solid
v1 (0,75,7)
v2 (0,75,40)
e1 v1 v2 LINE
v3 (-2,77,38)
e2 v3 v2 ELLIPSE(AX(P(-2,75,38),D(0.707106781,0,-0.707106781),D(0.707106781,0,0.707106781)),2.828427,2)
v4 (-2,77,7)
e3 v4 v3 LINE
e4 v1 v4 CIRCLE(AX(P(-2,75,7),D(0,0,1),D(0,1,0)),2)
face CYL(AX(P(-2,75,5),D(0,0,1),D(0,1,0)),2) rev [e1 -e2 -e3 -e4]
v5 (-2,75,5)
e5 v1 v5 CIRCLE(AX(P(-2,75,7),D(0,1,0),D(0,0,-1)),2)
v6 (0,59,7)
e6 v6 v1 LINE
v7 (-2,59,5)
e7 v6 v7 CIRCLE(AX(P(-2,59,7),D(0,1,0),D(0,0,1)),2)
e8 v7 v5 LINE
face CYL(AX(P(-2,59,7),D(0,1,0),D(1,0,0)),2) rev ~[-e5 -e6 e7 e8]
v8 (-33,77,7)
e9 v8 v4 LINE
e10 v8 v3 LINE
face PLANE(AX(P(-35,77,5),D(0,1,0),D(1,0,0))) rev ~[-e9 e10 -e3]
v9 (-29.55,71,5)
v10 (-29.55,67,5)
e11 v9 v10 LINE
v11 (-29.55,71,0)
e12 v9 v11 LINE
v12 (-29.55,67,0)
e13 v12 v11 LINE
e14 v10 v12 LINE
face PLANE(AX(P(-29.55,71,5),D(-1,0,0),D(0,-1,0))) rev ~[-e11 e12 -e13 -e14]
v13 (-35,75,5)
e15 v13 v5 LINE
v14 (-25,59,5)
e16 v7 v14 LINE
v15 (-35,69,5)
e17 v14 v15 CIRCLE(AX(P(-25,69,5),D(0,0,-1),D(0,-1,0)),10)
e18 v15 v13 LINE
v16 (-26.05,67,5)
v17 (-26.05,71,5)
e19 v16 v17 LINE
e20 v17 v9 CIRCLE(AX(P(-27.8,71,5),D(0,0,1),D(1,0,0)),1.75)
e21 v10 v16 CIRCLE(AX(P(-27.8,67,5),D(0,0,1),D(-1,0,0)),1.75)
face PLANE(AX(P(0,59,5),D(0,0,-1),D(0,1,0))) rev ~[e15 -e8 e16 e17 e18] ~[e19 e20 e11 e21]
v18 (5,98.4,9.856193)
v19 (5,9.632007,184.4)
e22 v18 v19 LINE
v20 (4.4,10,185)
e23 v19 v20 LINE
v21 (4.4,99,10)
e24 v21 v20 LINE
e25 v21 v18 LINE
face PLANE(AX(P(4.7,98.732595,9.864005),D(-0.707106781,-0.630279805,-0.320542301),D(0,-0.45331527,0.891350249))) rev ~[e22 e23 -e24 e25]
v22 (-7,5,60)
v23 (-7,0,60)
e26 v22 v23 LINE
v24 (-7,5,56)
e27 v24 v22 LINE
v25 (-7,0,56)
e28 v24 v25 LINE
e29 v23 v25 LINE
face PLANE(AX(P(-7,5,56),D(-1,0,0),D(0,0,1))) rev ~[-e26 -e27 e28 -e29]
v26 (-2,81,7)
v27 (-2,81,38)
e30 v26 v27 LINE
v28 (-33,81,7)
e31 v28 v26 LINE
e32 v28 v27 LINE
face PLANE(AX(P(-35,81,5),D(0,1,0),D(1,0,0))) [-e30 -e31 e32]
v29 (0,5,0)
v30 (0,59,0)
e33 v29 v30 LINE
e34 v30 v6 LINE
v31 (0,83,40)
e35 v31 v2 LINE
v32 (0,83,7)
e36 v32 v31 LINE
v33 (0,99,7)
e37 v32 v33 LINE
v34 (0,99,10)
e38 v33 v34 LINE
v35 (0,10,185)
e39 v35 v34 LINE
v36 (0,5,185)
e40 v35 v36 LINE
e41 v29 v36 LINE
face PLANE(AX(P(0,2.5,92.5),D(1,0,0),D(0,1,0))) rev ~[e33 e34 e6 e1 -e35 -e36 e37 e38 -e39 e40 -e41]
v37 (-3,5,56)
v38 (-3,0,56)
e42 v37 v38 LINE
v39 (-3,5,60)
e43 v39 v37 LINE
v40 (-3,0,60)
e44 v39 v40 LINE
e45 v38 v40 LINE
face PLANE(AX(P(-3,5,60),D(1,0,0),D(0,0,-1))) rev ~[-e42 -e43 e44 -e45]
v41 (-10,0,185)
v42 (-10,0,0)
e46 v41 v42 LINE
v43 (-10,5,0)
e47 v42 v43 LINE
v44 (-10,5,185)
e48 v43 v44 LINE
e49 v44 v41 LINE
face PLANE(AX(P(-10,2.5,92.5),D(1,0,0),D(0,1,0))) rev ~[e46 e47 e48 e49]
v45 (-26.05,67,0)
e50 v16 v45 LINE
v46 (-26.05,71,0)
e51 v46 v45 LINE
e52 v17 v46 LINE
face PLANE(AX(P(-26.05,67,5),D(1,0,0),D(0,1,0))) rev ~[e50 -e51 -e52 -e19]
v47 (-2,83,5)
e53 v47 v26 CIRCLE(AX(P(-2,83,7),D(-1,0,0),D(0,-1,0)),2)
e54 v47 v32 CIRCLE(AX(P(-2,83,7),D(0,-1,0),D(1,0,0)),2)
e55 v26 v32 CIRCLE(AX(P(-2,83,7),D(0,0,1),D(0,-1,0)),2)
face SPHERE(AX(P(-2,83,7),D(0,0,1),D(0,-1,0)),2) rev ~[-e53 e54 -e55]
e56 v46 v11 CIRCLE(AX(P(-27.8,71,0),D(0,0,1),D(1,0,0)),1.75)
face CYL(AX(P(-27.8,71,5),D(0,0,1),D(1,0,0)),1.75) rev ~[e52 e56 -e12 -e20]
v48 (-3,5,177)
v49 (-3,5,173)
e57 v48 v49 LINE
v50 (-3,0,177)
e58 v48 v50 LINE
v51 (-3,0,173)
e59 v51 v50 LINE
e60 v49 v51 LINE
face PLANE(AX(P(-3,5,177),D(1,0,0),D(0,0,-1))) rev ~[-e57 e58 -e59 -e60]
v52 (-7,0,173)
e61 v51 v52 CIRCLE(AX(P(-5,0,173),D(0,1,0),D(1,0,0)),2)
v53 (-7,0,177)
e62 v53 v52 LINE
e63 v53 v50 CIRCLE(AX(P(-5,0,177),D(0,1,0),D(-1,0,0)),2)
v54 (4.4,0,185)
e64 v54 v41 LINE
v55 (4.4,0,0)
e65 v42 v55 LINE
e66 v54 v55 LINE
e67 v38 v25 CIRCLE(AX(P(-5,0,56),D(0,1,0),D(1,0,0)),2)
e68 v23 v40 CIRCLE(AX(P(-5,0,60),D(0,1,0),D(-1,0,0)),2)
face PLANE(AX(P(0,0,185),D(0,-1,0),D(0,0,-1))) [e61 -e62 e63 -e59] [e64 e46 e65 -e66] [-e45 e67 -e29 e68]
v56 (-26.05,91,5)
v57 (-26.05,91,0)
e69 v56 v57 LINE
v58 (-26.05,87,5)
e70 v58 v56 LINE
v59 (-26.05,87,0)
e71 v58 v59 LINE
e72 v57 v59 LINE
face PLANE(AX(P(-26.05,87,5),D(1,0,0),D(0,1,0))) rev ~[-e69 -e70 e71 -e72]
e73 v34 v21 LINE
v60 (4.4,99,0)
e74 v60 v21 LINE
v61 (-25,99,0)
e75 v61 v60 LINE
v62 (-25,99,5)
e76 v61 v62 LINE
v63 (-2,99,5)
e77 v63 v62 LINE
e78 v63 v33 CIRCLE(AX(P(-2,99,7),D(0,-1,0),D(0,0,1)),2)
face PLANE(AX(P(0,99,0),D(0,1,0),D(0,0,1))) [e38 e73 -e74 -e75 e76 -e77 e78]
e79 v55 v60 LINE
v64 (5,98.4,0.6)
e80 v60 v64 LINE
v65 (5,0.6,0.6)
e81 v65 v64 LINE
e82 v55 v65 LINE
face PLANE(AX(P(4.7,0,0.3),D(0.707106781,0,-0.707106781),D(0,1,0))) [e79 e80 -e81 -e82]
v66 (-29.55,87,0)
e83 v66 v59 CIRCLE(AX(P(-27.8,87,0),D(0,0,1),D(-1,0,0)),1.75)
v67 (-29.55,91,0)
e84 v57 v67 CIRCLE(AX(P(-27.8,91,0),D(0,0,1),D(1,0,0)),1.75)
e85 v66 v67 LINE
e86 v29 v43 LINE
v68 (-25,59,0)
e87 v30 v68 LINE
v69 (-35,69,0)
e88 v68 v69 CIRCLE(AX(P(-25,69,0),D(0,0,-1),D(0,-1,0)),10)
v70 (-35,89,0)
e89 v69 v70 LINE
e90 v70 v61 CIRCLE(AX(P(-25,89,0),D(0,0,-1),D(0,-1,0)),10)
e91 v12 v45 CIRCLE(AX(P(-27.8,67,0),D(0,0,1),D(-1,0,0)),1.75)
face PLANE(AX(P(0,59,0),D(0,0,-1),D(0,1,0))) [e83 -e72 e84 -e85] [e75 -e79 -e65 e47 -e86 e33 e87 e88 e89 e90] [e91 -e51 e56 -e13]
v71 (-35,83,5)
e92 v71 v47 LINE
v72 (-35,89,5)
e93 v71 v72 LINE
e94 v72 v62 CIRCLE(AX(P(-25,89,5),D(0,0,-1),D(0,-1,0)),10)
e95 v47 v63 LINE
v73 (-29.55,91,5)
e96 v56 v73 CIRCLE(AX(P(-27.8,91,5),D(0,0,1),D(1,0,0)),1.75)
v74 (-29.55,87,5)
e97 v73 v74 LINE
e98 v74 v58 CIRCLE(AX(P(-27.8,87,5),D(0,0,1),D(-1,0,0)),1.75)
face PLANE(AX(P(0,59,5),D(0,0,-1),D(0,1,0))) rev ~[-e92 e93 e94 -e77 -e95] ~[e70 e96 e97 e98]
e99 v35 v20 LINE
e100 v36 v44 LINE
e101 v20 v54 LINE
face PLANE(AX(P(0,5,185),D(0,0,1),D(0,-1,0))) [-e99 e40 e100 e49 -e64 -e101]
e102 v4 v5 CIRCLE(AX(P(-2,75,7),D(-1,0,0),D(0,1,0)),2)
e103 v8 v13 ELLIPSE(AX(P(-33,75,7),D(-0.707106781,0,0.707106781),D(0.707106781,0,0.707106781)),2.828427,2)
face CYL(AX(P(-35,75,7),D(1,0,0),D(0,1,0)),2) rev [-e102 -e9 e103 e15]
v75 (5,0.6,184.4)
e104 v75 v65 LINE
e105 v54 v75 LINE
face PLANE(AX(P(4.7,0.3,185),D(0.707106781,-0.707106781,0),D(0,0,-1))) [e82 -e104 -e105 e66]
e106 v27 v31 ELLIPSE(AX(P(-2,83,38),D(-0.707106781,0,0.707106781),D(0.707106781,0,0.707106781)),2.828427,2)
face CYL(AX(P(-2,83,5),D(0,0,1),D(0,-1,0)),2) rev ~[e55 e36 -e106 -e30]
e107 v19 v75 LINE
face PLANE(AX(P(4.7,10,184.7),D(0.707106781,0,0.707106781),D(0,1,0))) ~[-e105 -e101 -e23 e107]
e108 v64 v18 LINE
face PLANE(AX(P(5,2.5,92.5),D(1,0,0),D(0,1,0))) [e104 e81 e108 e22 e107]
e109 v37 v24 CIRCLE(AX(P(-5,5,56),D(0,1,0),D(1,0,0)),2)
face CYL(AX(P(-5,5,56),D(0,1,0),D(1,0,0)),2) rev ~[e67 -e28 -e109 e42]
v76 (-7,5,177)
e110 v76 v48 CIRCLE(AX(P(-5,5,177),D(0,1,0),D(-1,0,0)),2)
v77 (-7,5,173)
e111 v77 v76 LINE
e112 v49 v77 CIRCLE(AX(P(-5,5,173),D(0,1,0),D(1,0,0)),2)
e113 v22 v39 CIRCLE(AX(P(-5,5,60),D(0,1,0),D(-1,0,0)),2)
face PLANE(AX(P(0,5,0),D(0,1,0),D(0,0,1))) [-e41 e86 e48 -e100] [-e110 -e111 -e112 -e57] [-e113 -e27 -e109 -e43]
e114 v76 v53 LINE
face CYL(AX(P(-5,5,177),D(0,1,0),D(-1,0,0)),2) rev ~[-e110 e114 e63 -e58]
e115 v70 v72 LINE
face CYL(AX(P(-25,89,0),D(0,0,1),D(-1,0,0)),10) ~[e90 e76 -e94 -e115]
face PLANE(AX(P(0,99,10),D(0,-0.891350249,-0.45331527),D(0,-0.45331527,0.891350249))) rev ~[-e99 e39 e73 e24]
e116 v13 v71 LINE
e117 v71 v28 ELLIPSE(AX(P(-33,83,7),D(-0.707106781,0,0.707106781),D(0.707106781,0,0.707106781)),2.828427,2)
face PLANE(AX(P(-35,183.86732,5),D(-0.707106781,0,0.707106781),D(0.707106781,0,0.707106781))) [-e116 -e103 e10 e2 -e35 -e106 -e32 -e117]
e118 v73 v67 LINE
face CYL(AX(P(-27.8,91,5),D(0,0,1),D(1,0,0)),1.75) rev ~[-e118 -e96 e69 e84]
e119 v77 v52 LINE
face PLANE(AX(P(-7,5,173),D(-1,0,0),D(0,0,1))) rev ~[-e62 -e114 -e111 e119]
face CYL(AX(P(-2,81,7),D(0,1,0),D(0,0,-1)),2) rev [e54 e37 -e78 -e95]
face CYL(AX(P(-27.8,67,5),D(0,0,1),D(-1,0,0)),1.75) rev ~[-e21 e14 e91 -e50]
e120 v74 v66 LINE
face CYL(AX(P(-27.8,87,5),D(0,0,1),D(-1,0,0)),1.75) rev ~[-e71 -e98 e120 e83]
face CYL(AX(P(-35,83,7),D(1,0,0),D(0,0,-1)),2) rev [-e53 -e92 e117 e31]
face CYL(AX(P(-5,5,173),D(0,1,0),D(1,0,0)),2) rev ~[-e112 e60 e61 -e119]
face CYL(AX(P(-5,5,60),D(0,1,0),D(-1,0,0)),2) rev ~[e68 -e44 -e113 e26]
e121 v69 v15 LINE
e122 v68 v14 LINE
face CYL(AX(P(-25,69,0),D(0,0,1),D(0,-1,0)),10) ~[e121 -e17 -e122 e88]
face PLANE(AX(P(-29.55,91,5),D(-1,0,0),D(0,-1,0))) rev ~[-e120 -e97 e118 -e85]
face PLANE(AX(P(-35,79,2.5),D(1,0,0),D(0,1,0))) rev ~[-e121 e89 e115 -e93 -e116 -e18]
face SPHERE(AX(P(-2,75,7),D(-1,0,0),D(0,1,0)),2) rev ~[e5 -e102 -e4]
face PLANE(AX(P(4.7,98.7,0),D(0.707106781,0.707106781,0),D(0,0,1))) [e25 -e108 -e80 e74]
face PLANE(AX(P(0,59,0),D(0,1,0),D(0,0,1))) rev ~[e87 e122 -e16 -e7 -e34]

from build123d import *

# Parameters (mm, degrees)
F0_W        = 54
F0_H        = 5
F0_W_2      = 40
F1_DEPTH    = 5
F2_DEPTH    = 10
F3_DEPTH    = 35
F5_DEPTH    = 5.001
F7_DEPTH    = 5.001
F4_W        = 35
F4_H        = 4
F8_DEPTH    = 40
F9_T4_DEPTH = 106.8673195186
F10_R       = 2
F11_R       = 10
F12_SIZE    = 0.6


# Not quite as in the source:
# - a fillet or chamfer that OpenCascade refuses, or shapes differently, is made with other operations: its cross-section is extruded or revolved along the edge and cut away or added


with BuildPart() as f1:
    # F0 (on Right) → F1 (new body)
    with BuildSketch(Plane.YZ):
        Polygon((0, 185), (0, 0), (5, 0), (5, 5), (5, 185), align=None)
        with Locations((32, 2.5)):
            Rectangle(F0_W, F0_H)
        Polygon((10, 185), (5, 185), (5, 5), (59, 5), (99, 5), (99, 10), align=None)
        with Locations((79, 2.5)):
            Rectangle(F0_W_2, F0_H)
    extrude(amount=F1_DEPTH)

    # F0 (on Right) → F2 (join)
    with BuildSketch(Plane.YZ):
        Polygon((0, 185), (0, 0), (5, 0), (5, 5), (5, 185), align=None)
    extrude(amount=-F2_DEPTH)

    # F0 (on Right) → F3 (join)
    with BuildSketch(Plane.YZ):
        with Locations((79, 2.5)):
            Rectangle(F0_W_2, F0_H)
    extrude(amount=-F3_DEPTH)

    # F4 (on face) → F5 (cut, through all)
    with BuildSketch(Plane.XY.offset(5)):
        with BuildLine():
            Line((-26.05, 69), (-26.05, 71))
            ThreePointArc((-26.05, 71), (-27.8, 72.75), (-29.55, 71))
            Line((-29.55, 71), (-29.55, 69))
            Line((-29.55, 69), (-29.55, 67))
            ThreePointArc((-29.55, 67), (-27.8, 65.25), (-26.05, 67))
            Line((-26.05, 67), (-26.05, 69))
        make_face()
        with BuildLine():
            Line((-26.05, 89), (-26.05, 91))
            ThreePointArc((-26.05, 91), (-27.8, 92.75), (-29.55, 91))
            Line((-29.55, 91), (-29.55, 89))
            Line((-29.55, 89), (-29.55, 87))
            ThreePointArc((-29.55, 87), (-27.8, 85.25), (-26.05, 87))
            Line((-26.05, 87), (-26.05, 89))
        make_face()
    extrude(amount=-F5_DEPTH, mode=Mode.SUBTRACT)

    # F6 (on face) → F7 (cut, through all)
    with BuildSketch(Plane(origin=(0, 5, 0), x_dir=(-1, 0, 0), z_dir=(0, 1, 0))):
        with BuildLine():
            Line((7, 58), (7, 60))
            ThreePointArc((7, 60), (5, 62), (3, 60))
            Line((3, 60), (3, 58))
            Line((3, 58), (3, 56))
            ThreePointArc((3, 56), (5, 54), (7, 56))
            Line((7, 56), (7, 58))
        make_face()
        with BuildLine():
            Line((7, 175), (7, 177))
            ThreePointArc((7, 177), (5, 179), (3, 177))
            Line((3, 177), (3, 175))
            Line((3, 175), (3, 173))
            ThreePointArc((3, 173), (5, 171), (7, 173))
            Line((7, 173), (7, 175))
        make_face()
    extrude(amount=-F7_DEPTH, mode=Mode.SUBTRACT)

    # F4 (on face) → F8 (join)
    with BuildSketch(Plane.XY.offset(5)):
        with Locations((-17.5, 79)):
            Rectangle(F4_W, F4_H)
    extrude(amount=F8_DEPTH)

    # F9: chamfer of 40 on 1 edges, made by hand


with BuildPart() as f9_tool2:
    # F9_s3 → F9_t4 (new body)
    with BuildSketch(Plane.XZ.offset(-183.8673195186)):
        Polygon((-35, 5), (5, 45), (-35, 45), align=None)
    extrude(amount=F9_T4_DEPTH)

    split(bisect_by=Plane.YZ, keep=Keep.BOTTOM)


with BuildPart() as f1_1:
    add(f1.part)

    # F9_t1: cut F9_tool2
    add(f9_tool2.part, mode=Mode.SUBTRACT)

    # F10
    f10_edges = [f1_1.edges().sort_by_distance(p)[0] for p in [
        (-17.5, 77, 5),
        (0, 77, 22.5),
        (0, 81, 22.5),
        (-17.5, 81, 5),
        (0, 68, 5),
        (0, 90, 5),
    ]]
    fillet(f10_edges, radius=F10_R)

    # F11
    f11_edges = [f1_1.edges().sort_by_distance(p)[0] for p in [
        (-35, 59, 2.5),
        (-35, 99, 2.5),
    ]]
    fillet(f11_edges, radius=F11_R)

    # F12
    f12_edges = [f1_1.edges().sort_by_distance(p)[0] for p in [
        (5, 0, 92.5),
        (5, 49.5, 0),
        (5, 99, 5),
        (5, 54.5, 97.5),
        (5, 5, 185),
    ]]
    chamfer(f12_edges, length=F12_SIZE)


solid = f1_1.part
